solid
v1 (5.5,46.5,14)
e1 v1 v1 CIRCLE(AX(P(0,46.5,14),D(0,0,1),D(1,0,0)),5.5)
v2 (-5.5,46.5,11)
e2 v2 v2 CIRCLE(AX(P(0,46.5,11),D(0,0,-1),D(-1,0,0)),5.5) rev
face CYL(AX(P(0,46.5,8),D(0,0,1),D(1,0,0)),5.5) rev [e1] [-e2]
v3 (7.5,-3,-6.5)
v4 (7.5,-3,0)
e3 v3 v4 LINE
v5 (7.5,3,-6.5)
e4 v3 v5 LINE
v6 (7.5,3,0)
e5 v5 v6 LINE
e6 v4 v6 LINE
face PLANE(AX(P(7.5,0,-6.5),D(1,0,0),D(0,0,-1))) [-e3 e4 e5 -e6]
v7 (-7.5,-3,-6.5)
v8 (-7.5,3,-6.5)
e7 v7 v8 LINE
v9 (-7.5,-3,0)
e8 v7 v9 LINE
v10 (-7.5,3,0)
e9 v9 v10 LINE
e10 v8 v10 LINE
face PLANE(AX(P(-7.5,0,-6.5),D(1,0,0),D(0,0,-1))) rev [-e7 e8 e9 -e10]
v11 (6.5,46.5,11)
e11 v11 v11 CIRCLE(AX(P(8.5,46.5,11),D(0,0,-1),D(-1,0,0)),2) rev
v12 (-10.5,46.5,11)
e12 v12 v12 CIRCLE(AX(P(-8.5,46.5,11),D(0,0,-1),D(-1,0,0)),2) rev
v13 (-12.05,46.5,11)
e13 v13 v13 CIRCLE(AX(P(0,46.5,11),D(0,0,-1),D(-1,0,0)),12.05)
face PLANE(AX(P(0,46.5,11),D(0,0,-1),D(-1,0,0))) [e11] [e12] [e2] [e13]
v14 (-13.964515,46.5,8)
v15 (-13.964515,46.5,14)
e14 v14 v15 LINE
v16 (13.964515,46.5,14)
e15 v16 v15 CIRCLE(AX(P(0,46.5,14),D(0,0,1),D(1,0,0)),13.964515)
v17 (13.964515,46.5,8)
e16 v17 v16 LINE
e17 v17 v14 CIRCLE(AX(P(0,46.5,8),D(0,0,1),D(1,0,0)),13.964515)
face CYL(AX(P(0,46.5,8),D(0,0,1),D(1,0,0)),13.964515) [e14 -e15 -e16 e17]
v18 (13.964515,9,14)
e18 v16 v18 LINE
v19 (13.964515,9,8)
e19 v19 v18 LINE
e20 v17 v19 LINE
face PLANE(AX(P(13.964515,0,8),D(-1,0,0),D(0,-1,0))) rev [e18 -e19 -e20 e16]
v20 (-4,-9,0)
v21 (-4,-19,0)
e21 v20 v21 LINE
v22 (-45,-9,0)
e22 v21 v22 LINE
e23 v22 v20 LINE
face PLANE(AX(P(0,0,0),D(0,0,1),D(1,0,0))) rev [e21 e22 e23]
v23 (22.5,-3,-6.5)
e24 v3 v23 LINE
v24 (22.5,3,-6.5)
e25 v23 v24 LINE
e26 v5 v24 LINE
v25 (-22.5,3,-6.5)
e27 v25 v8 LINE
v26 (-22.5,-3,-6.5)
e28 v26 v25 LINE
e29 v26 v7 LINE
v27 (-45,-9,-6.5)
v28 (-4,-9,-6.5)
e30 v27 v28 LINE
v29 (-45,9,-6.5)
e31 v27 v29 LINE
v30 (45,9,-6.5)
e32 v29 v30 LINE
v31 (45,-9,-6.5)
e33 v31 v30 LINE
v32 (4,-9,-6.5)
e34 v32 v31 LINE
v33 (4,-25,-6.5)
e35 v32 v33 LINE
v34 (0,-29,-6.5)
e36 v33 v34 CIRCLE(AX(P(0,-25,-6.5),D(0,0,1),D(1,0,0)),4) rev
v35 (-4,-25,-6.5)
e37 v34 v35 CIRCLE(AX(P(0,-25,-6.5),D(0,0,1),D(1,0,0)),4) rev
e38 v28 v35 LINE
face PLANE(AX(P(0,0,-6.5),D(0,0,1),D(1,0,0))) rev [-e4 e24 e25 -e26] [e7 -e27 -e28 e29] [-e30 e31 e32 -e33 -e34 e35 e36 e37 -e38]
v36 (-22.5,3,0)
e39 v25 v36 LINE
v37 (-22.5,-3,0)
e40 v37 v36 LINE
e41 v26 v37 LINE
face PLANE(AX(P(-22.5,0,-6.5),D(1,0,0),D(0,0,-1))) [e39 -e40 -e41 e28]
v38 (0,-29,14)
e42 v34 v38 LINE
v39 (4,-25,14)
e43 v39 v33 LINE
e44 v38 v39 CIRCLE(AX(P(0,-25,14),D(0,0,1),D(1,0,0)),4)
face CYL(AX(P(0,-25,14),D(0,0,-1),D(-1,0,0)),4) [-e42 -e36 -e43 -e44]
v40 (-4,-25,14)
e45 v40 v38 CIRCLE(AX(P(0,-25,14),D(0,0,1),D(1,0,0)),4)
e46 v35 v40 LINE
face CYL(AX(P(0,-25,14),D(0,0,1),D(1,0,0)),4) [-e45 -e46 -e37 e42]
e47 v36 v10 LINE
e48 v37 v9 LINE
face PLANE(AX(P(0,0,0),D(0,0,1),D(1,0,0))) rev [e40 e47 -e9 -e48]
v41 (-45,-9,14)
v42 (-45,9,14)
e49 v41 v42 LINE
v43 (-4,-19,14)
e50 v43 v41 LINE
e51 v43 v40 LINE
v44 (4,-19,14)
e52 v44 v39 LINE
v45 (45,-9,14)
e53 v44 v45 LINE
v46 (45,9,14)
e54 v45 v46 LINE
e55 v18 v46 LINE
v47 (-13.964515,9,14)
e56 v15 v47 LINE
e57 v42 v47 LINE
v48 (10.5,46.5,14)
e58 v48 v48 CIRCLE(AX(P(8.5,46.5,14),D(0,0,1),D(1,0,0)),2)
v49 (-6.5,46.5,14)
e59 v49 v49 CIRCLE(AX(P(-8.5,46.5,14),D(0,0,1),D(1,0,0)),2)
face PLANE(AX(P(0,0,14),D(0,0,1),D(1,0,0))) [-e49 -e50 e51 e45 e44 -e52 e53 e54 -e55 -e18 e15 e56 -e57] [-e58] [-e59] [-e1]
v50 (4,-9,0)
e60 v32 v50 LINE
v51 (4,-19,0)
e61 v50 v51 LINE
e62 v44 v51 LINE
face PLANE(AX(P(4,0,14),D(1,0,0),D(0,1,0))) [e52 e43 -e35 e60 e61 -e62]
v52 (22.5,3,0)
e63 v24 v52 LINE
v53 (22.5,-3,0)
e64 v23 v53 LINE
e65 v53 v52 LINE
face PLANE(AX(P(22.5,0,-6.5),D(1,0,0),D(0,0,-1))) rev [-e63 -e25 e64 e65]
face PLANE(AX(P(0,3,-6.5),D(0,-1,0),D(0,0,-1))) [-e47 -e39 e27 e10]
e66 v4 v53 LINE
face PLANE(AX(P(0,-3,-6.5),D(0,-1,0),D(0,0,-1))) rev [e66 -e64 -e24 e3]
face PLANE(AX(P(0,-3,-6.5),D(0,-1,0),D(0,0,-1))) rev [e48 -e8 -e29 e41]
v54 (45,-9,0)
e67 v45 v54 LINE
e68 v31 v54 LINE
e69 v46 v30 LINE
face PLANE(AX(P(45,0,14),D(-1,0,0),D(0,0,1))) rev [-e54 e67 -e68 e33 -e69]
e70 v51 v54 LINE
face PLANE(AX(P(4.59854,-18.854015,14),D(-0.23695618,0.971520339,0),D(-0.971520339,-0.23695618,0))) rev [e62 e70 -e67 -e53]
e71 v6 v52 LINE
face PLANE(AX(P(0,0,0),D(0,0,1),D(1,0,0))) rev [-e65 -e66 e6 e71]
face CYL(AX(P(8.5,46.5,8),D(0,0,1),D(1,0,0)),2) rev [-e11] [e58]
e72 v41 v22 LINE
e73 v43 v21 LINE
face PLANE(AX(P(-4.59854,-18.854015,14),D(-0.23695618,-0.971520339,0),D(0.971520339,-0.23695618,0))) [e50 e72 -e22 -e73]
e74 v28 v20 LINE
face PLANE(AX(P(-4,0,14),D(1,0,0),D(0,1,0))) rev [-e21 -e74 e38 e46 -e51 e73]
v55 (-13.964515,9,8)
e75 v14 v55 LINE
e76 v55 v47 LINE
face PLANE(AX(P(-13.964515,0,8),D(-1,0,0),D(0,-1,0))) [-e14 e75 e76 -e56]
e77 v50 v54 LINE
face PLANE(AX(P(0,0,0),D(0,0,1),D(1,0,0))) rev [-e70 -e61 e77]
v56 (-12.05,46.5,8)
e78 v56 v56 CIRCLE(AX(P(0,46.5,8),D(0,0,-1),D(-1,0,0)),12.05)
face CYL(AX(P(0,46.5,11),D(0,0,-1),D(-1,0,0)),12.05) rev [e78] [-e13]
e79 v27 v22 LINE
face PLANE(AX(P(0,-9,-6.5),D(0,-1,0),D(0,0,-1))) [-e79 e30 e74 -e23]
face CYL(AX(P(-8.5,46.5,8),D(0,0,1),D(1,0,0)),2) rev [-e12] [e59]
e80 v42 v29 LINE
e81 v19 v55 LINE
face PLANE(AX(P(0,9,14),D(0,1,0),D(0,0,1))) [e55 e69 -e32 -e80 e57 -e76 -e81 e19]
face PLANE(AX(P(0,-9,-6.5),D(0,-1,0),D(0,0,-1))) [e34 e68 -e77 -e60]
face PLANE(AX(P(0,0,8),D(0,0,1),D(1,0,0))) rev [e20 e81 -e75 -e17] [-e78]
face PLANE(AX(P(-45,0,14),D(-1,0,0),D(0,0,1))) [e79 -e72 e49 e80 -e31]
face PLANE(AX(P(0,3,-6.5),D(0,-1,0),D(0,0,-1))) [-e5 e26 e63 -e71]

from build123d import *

# Parameters (mm, degrees)
SKETCH1_W           = 15
SKETCH1_H           = 6
SKETCH1_W_2         = 8
SKETCH1_H_2         = 20
BOSS_EXTRUDE1_DEPTH = 14
SKETCH3_W           = 15
SKETCH3_H           = 6
SKETCH3_W_2         = 8
SKETCH3_H_2         = 20
BOSS_EXTRUDE2_DEPTH = 6.5
FILLET1_R           = 4
SKETCH4_R           = 2
SKETCH4_R_2         = 5.5
BOSS_EXTRUDE3_DEPTH = 6
SKETCH5_R           = 12.05
CUT_EXTRUDE1_DEPTH  = 3


with BuildPart() as part:
    # Sketch1 → Boss-Extrude1 (new body)
    # profile 1 of 6: a face of its own
    with BuildSketch(Plane.XY):
        Polygon((-4, -9), (4, -9), (45, -9), (45, 9), (-45, 9), (-45, -9), align=None)
        with Locations((-15, 0)):
            Rectangle(SKETCH1_W, SKETCH1_H, mode=Mode.SUBTRACT)
        with Locations((15, 0)):
            Rectangle(SKETCH1_W, SKETCH1_H, mode=Mode.SUBTRACT)
    # profile 2 of 6: a face of its own
    with BuildSketch(Plane.XY):
        with Locations((0, -19)):
            Rectangle(SKETCH1_W_2, SKETCH1_H_2)
    # profile 3 of 6: a face of its own
    with BuildSketch(Plane.XY):
        with Locations((-15, 0)):
            Rectangle(SKETCH1_W, SKETCH1_H)
    # profile 4 of 6: a face of its own
    with BuildSketch(Plane.XY):
        with Locations((15, 0)):
            Rectangle(SKETCH1_W, SKETCH1_H)
    # profile 5 of 6: a face of its own
    with BuildSketch(Plane.XY):
        Polygon((45, -9), (4, -9), (4, -19), align=None)
    # profile 6 of 6: a face of its own
    with BuildSketch(Plane.XY):
        Polygon((-4, -19), (-4, -9), (-45, -9), align=None)
    extrude(amount=BOSS_EXTRUDE1_DEPTH)

    # Sketch3 → Boss-Extrude2 (add)
    # profile 1 of 2: a face of its own
    with BuildSketch(Plane.XY):
        Polygon((-4, -9), (4, -9), (45, -9), (45, 9), (-45, 9), (-45, -9), align=None)
        with Locations((-15, 0)):
            Rectangle(SKETCH3_W, SKETCH3_H, mode=Mode.SUBTRACT)
        with Locations((15, 0)):
            Rectangle(SKETCH3_W, SKETCH3_H, mode=Mode.SUBTRACT)
    # profile 2 of 2: a face of its own
    with BuildSketch(Plane.XY):
        with Locations((0, -19)):
            Rectangle(SKETCH3_W_2, SKETCH3_H_2)
    extrude(amount=-BOSS_EXTRUDE2_DEPTH)

    # Fillet1
    fillet1_edges = [part.edges().sort_by_distance(p)[0] for p in [
        (-4, -29, 3.75),
        (4, -29, 3.75),
    ]]
    fillet(fillet1_edges, radius=FILLET1_R - 0.0001)  # a hair under: the kernel refuses the full size

    # Sketch4 → Boss-Extrude3 (add)
    with BuildSketch(Plane.XY.offset(14)):
        with BuildLine():
            Line((13.964514824, 9), (13.964514824, 46.5))
            ThreePointArc((13.964514824, 46.5), (0, 60.464514824), (-13.964514824, 46.5))
            Line((-13.964514824, 46.5), (-13.964514824, 9))
            Line((-13.964514824, 9), (13.964514824, 9))
        make_face()
        with Locations((8.5, 46.5)):
            Circle(SKETCH4_R, mode=Mode.SUBTRACT)
        with Locations((-8.5, 46.5)):
            Circle(SKETCH4_R, mode=Mode.SUBTRACT)
        with Locations((0, 46.5)):
            Circle(SKETCH4_R_2, mode=Mode.SUBTRACT)
    extrude(amount=-BOSS_EXTRUDE3_DEPTH)

    # Sketch5 → Cut-Extrude1 (cut)
    with BuildSketch(Plane(origin=(0, 0, 8), x_dir=(-1, 0, 0), z_dir=(0, 0, -1))):
        with Locations((0, 46.5)):
            Circle(SKETCH5_R)
    extrude(amount=-CUT_EXTRUDE1_DEPTH, mode=Mode.SUBTRACT)


solid = part.part
